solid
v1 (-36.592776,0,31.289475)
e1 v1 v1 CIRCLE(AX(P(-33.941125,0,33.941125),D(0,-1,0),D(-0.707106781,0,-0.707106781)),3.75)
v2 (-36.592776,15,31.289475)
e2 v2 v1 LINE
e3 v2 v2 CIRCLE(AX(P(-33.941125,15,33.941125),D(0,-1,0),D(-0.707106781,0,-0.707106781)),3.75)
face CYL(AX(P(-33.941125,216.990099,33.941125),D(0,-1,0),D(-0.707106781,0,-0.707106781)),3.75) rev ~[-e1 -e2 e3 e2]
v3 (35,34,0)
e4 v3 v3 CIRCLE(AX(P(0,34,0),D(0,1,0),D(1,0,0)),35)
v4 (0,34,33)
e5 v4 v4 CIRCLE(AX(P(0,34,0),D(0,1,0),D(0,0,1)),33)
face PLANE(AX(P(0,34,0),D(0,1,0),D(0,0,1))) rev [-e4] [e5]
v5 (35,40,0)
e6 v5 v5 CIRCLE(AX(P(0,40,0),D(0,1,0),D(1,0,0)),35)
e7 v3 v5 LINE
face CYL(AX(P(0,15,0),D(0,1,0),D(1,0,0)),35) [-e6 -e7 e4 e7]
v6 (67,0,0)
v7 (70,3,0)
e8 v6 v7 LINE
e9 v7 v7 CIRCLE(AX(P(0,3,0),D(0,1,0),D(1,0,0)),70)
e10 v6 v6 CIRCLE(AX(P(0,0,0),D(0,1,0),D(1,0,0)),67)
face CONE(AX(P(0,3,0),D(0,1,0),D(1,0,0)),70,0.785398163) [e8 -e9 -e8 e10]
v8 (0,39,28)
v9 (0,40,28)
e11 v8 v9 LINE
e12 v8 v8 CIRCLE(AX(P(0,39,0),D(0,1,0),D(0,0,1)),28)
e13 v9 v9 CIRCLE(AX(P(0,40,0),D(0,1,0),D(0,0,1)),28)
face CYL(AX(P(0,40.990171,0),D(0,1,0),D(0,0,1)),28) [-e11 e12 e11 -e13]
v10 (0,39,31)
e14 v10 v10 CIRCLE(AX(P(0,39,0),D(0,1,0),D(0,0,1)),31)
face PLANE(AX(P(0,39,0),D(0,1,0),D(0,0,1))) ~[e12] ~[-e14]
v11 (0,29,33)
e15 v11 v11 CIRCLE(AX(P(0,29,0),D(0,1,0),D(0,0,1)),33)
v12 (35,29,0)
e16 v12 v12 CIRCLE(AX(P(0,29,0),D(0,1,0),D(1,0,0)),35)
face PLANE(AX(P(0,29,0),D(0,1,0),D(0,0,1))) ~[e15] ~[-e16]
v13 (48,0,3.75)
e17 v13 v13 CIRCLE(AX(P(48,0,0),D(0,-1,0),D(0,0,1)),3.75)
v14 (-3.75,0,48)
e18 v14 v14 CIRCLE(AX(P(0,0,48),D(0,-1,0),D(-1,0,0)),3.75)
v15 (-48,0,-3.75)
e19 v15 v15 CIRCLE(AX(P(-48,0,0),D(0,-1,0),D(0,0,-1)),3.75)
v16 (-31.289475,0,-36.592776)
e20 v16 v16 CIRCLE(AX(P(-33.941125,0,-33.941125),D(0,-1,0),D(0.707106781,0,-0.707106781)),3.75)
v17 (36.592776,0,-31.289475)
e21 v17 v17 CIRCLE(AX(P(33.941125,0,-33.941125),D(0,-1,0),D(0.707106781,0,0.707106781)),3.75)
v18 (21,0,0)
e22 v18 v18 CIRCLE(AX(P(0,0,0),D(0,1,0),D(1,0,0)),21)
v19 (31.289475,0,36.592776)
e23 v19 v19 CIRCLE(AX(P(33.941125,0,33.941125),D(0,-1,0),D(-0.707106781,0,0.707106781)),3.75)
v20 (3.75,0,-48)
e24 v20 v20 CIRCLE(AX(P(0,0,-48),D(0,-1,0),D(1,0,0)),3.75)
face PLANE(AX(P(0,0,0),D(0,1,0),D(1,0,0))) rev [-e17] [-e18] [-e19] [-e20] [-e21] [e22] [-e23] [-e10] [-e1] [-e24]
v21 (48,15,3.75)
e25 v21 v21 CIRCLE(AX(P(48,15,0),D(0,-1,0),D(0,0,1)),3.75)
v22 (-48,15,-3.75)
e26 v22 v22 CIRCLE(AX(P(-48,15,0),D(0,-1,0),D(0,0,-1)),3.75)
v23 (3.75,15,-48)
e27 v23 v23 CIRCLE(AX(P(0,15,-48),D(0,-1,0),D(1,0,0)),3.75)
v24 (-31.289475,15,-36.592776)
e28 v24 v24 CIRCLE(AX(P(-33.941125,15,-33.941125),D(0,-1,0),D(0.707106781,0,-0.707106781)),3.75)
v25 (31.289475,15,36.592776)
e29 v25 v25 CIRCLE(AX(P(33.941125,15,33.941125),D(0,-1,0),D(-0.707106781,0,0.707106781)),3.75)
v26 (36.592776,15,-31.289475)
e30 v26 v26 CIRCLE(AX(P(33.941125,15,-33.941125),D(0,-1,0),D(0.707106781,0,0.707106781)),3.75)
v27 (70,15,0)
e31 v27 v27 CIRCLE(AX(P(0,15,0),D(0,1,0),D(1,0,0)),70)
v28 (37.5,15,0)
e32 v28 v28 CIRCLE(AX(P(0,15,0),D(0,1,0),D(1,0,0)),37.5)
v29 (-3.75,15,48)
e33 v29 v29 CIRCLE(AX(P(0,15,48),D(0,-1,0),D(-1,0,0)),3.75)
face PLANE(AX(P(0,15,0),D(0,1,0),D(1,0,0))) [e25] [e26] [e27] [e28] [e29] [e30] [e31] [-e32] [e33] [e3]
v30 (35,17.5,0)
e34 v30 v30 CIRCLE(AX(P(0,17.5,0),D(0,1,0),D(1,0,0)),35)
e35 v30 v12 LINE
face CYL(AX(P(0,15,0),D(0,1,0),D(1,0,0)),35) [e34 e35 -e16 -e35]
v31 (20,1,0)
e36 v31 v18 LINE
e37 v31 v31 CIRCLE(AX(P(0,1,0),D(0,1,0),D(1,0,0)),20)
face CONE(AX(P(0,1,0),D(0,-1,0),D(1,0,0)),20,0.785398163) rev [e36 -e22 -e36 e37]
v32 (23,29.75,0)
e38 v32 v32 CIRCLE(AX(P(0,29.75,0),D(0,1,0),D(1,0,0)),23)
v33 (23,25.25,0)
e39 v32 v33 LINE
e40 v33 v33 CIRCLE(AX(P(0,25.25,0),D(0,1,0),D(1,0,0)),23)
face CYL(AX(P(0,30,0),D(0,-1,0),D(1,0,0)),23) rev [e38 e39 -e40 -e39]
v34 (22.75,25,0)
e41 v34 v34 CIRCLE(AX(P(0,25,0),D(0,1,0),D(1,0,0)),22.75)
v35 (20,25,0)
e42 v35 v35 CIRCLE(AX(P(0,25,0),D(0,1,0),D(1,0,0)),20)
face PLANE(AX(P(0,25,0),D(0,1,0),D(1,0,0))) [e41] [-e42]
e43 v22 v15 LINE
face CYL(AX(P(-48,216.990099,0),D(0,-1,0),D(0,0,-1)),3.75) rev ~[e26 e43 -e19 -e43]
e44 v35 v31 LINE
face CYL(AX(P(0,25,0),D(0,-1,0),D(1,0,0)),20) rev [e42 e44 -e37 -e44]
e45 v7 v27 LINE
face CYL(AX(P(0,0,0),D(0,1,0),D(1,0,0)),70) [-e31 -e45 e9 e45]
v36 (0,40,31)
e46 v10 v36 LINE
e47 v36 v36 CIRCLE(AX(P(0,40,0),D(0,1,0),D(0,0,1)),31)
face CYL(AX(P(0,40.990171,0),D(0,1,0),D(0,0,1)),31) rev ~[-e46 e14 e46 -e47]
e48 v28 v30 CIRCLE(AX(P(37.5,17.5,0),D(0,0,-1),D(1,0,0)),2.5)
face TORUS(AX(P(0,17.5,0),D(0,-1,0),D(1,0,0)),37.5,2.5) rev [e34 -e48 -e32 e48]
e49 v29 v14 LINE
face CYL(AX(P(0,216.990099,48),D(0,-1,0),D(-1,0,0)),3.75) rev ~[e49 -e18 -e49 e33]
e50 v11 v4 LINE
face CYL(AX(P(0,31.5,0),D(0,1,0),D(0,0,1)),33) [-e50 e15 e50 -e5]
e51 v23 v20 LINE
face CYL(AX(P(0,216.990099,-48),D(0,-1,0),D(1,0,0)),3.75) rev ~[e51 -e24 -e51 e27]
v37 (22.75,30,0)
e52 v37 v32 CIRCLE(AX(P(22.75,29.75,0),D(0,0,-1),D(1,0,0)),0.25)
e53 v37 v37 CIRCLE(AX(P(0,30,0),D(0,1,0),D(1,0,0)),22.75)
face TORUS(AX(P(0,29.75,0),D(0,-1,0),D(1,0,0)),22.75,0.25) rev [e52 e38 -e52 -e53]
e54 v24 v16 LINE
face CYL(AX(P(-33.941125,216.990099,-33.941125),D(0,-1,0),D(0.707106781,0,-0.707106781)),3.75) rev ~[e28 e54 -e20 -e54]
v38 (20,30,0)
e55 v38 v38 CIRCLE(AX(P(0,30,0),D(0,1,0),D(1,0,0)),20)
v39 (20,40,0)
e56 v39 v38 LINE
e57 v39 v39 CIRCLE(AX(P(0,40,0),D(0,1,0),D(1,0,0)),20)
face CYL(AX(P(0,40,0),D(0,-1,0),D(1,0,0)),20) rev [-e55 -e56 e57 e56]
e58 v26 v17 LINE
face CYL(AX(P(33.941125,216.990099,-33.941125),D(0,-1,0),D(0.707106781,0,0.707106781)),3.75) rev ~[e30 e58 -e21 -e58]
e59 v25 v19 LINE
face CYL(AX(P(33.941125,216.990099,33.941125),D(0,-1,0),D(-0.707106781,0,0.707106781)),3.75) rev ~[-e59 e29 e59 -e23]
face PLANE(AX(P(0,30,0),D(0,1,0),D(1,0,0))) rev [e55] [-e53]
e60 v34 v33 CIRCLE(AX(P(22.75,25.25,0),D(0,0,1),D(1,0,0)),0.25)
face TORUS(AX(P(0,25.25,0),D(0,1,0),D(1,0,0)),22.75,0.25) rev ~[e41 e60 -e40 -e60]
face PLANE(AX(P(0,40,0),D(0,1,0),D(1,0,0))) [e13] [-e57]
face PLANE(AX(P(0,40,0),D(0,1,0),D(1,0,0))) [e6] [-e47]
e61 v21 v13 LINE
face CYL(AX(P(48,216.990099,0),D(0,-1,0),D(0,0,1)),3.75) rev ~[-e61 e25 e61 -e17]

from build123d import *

# Parameters (mm, degrees)
F2_R            = 2.5
F3_R            = 0.25
F4_SIZE         = 1
F5_SIZE         = 3
F7_D            = 7.5
F7_COPIES_COUNT = 8
F8_W            = 5
F8_H            = 12.3844173994
F10_W           = 3.9803426395
F10_H           = 3


# Not quite as in the source:
# - a pattern or mirror of a feature is missing from the dataset's text; its kind, count and spacing are read off the source's solid


with BuildPart() as f1:
    # F0 (on Top) → F1 (revolve)
    with BuildSketch(Plane.XY):
        Polygon((70, 15), (35, 15), (35, 40), (20, 40), (20, 30), (23, 30), (23, 25), (20, 25), (20, 0), (70, 0), align=None)
    revolve(axis=Axis((0, 48.9874315186, 0), (0, 1, 0)))

    # F2
    f2_edges = [f1.edges().sort_by_distance(p)[0] for p in [
        (-35, 15, 0),
    ]]
    fillet(f2_edges, radius=F2_R)

    # F3
    f3_edges = [f1.edges().sort_by_distance(p)[0] for p in [
        (-23, 30, 0),
        (-23, 25, 0),
    ]]
    fillet(f3_edges, radius=F3_R)

    # F4
    f4_edges = [f1.edges().sort_by_distance(p)[0] for p in [
        (-20, 0, 0),
    ]]
    chamfer(f4_edges, length=F4_SIZE)

    # F5
    f5_edges = [f1.edges().sort_by_distance(p)[0] for p in [
        (-70, 0, 0),
    ]]
    chamfer(f5_edges, length=F5_SIZE)

    # F7 (through all)
    with Locations(Plane(origin=(0, 15, 0), x_dir=(-1, 0, 0), z_dir=(0, 1, 0))):
        with Locations((0, -48)):
            f7 = Hole(F7_D / 2)

    # F7_copies: F7 ×8 about axis
    f7_copies_axis = Axis((0, 0, 0), (0, 1, 0))
    for i in range(1, F7_COPIES_COUNT):
        add(f7.rotate(f7_copies_axis, i * 360 / F7_COPIES_COUNT), mode=Mode.SUBTRACT)

    # F8 (on Right) → F9 (revolve, cut)
    with BuildSketch(Plane.YZ):
        with Locations((31.5, 39.1922086997)):
            Rectangle(F8_W, F8_H)
    revolve(axis=Axis((0, 33.8349905132, 0), (0, 1, 0)), mode=Mode.SUBTRACT)

    # F10 (on Right) → F11 (revolve, cut)
    with BuildSketch(Plane.YZ):
        with Locations((40.9901713197, 29.5)):
            Rectangle(F10_W, F10_H)
    revolve(axis=Axis((0, 26.3936025676, 0), (0, 1, 0)), mode=Mode.SUBTRACT)


solid = f1.part
